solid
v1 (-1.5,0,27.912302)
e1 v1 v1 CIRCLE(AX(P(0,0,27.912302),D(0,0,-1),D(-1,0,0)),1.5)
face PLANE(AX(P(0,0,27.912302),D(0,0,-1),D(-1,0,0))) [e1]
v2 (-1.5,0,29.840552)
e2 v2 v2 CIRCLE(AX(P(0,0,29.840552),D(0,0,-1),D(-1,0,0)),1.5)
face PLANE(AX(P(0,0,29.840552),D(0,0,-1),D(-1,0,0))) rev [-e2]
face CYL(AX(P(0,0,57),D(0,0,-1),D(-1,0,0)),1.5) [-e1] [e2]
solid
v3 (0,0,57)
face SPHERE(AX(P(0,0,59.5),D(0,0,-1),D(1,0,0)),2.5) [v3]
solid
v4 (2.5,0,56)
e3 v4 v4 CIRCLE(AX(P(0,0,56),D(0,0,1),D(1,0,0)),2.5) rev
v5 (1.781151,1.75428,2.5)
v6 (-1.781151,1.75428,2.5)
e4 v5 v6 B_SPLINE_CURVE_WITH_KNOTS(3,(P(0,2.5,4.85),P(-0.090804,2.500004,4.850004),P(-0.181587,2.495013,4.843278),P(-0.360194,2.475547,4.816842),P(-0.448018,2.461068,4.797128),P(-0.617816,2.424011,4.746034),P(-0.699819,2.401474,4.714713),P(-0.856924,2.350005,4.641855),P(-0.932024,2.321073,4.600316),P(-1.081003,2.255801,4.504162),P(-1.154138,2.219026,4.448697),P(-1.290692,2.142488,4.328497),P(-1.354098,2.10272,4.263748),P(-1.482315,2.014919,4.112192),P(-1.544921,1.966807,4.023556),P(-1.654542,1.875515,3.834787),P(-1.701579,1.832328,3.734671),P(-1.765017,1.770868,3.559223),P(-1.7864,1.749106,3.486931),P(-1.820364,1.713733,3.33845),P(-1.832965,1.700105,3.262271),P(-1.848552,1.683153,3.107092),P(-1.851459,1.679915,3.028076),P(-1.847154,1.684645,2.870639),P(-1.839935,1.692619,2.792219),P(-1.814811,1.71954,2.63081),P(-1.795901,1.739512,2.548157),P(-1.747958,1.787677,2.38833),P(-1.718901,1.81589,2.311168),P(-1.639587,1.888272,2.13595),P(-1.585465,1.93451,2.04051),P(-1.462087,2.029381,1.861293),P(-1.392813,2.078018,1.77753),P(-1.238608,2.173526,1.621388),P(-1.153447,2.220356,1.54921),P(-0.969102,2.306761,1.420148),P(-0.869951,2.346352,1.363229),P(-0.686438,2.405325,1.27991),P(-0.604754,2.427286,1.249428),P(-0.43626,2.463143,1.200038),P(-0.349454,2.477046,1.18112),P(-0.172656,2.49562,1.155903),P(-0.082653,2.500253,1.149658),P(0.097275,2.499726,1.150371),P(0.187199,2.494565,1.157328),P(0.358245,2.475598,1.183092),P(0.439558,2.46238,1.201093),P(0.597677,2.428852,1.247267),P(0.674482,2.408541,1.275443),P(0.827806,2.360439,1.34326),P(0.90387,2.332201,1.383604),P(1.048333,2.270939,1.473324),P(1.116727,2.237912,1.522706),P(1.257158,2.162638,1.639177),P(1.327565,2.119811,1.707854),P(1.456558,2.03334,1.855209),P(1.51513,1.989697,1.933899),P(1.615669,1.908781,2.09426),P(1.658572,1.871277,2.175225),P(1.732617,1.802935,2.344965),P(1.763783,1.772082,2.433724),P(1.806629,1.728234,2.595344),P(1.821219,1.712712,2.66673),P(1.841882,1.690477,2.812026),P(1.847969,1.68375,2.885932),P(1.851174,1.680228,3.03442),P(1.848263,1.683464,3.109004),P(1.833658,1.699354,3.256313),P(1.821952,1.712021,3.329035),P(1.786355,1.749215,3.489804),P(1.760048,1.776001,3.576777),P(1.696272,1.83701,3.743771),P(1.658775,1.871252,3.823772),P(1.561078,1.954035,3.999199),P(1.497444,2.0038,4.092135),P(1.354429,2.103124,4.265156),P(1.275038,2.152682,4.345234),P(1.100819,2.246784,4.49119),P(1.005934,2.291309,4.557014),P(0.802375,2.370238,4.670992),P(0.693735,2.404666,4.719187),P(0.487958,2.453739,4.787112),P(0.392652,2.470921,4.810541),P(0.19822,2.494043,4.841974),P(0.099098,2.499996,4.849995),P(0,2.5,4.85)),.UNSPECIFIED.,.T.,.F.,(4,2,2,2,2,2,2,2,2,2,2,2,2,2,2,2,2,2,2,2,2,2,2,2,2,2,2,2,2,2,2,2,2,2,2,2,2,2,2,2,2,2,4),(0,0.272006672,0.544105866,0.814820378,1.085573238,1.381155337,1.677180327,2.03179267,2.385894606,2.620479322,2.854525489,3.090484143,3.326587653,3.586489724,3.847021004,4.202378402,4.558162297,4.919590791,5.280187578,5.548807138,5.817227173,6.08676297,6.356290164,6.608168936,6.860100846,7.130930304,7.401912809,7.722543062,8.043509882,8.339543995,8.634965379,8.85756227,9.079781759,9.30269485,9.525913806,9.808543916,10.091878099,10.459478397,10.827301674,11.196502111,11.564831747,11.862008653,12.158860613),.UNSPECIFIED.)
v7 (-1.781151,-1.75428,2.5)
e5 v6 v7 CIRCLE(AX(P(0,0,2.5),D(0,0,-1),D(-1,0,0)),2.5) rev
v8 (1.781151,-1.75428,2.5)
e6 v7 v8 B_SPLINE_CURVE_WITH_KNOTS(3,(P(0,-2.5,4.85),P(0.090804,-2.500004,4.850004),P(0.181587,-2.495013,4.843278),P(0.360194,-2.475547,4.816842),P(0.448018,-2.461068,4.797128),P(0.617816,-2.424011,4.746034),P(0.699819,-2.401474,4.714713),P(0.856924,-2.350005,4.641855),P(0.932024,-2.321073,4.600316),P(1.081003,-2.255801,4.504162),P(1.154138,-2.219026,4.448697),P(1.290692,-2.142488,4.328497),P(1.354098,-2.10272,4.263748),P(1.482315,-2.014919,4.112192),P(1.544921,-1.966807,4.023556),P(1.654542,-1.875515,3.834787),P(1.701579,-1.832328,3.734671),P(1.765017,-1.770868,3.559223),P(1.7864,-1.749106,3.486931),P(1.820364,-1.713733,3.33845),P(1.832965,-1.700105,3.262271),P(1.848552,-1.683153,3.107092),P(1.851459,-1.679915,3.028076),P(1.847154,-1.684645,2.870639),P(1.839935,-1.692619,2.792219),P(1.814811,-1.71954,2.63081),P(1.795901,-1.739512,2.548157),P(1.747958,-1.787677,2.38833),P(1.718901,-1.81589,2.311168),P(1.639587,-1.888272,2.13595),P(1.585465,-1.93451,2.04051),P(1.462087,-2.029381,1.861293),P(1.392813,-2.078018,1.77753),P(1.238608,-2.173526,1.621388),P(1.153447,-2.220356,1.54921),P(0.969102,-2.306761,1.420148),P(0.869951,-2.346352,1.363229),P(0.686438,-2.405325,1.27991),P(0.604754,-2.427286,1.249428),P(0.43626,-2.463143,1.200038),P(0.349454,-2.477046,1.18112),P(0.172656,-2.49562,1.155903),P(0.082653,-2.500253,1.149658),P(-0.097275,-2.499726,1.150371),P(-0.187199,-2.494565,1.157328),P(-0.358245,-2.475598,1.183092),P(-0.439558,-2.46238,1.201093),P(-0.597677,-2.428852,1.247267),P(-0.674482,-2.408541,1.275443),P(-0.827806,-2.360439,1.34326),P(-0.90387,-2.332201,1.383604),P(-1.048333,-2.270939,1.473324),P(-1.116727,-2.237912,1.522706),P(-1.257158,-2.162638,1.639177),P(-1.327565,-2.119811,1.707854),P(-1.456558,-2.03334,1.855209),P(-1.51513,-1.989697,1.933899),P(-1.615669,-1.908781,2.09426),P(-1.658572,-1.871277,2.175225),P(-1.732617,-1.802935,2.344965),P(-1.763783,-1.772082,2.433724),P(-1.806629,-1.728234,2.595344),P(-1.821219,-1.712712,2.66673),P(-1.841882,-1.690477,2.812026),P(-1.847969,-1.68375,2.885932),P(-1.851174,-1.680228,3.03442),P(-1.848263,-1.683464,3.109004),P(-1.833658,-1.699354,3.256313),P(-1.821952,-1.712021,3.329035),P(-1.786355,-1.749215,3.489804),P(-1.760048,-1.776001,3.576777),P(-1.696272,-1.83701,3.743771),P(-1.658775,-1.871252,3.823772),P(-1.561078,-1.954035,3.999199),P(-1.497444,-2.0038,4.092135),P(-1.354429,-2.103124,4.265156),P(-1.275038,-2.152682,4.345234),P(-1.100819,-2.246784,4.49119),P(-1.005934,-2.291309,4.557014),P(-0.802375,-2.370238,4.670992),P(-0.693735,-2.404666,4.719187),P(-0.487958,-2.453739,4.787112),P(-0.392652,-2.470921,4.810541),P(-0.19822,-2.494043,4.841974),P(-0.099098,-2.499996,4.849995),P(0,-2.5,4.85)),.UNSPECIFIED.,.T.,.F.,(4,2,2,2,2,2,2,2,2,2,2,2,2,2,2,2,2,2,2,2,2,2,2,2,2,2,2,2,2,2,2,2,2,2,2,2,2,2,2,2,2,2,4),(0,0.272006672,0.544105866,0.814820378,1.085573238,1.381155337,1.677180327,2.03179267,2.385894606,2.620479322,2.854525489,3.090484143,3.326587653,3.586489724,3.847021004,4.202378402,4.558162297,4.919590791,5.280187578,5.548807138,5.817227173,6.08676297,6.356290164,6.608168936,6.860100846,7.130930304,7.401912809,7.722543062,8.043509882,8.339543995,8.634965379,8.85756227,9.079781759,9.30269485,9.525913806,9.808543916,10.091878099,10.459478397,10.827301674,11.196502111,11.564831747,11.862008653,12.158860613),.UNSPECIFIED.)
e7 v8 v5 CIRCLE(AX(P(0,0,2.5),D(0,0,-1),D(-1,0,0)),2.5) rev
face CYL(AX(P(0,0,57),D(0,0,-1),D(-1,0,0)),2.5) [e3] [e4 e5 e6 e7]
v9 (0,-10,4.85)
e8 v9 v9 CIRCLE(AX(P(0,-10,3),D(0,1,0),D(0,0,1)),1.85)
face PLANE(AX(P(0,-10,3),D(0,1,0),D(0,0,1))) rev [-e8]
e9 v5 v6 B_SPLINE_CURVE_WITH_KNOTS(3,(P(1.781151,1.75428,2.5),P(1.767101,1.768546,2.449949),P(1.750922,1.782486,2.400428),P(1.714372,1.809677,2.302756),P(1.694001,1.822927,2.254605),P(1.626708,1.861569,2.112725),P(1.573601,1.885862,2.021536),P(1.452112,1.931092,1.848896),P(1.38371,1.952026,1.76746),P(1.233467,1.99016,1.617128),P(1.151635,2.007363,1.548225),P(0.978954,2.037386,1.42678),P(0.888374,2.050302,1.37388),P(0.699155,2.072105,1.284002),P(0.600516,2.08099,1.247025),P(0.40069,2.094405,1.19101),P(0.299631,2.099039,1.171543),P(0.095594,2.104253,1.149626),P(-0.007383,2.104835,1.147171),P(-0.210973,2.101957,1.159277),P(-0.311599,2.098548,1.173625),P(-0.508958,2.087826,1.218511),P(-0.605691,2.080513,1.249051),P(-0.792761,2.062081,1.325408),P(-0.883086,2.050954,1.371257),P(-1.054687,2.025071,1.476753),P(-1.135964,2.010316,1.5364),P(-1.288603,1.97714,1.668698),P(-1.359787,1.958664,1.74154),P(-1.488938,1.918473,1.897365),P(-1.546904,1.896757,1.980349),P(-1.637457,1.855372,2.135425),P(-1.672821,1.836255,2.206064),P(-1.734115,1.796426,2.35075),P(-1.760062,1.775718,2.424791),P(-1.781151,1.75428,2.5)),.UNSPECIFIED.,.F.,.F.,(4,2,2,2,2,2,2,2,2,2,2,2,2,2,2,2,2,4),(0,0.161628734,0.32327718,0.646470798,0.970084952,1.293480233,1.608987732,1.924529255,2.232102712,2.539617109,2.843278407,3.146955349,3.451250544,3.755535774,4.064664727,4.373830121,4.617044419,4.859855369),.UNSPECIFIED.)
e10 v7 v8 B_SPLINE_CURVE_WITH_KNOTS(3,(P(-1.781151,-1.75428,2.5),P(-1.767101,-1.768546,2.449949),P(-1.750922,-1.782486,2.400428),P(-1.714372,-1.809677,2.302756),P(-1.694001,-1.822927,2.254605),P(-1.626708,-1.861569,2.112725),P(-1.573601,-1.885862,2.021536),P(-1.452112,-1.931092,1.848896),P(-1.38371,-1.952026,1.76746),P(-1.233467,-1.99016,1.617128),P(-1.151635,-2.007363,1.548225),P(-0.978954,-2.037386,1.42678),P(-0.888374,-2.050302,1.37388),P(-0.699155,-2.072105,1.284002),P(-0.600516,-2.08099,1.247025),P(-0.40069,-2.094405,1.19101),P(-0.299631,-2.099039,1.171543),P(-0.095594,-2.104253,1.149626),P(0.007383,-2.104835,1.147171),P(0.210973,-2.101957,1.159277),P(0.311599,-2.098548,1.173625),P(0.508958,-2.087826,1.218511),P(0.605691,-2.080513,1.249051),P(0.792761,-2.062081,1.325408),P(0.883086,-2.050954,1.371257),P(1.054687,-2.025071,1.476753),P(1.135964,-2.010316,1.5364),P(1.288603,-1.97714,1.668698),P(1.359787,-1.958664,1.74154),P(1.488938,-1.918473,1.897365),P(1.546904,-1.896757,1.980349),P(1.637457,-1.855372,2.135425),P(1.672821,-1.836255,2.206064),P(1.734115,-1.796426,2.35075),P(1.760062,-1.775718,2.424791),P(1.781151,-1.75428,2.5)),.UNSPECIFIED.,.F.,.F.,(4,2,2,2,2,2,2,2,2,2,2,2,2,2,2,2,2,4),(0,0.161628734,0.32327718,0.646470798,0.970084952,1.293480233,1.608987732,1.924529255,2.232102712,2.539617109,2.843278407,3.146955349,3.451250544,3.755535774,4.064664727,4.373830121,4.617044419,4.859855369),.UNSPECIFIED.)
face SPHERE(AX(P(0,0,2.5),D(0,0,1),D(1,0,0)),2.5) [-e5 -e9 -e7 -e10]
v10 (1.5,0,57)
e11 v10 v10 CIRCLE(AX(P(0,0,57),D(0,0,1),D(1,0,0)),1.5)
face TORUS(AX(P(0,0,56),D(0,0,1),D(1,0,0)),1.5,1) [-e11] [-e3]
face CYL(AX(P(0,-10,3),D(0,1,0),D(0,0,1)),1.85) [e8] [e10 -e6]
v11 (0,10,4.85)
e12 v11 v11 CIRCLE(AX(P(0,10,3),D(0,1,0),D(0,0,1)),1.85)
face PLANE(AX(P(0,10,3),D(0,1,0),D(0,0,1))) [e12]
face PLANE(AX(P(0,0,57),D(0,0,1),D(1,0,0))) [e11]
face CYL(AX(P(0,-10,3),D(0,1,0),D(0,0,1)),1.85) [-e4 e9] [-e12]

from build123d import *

# Parameters (mm, degrees)
SKETCH1_R                = 2.5
BOSS_EXTRUDE1_DEPTH      = 57
SKETCH3_W                = 1.5
SKETCH3_H                = 1.928249817
FILLET1_R                = 1
BOSS_EXTRUDE2_DEPTH      = 10
BOSS_EXTRUDE2_DEPTH_BACK = 10
SKETCH4_R                = 1.85
FILLET2_R                = 2.5


with BuildPart() as part:
    # Sketch1 → Boss-Extrude1 (new body)
    with BuildSketch(Plane.XY):
        with Locations(Location((0, 0, 0), (0, 0, 180))):
            Circle(SKETCH1_R)
    extrude(amount=BOSS_EXTRUDE1_DEPTH)

    # Fillet1
    fillet1_edges = [part.edges().sort_by_distance(p)[0] for p in [
        (2.5, 0, 57),
    ]]
    fillet(fillet1_edges, radius=FILLET1_R)

    # Sketch4 → Boss-Extrude2 (add, two sides: drawn at the far end of the back side and taken through both)
    with BuildSketch(Plane(origin=(0, 0, 0), x_dir=(1, 0, 0), z_dir=(0, 1, 0)).offset(-BOSS_EXTRUDE2_DEPTH_BACK)):
        with Locations(Location((0, -3, 0), (0, 0, 270))):
            Circle(SKETCH4_R)
    extrude(amount=BOSS_EXTRUDE2_DEPTH + BOSS_EXTRUDE2_DEPTH_BACK)

    # Fillet2
    # the kernel refuses this fillet: 2.5 mm, written as the material it takes off along each edge
    with BuildSketch(Plane(origin=(0, 0, 0), x_dir=(-1, 0, 0), z_dir=(0, 1, 0))) as fillet2_piece_1_section:
        with BuildLine():
            CenterArc((2.5 - FILLET2_R, FILLET2_R), FILLET2_R, 270, 90)
            Line((2.5 - FILLET2_R, 0), (2.5, 0))
            Line((2.5, 0), (2.5, FILLET2_R))
        make_face()
    fillet2_piece_1 = revolve(axis=Axis((0, 0, 0), (0, 0, 1)), mode=Mode.PRIVATE)
    fillet2_piece_1 = fillet2_piece_1 - Plane(origin=(0, 0, 3), x_dir=(0, 0, 1), z_dir=(0, -1, 0)) * Cylinder(1.85, 10, mode=Mode.PRIVATE)
    add(fillet2_piece_1, mode=Mode.SUBTRACT)


with BuildPart() as body_2:
    # Sketch3 → Revolve1 (revolve)
    with BuildSketch(Plane(origin=(0, 0, 0), x_dir=(1, 0, 0), z_dir=(0, 1, 0)), mode=Mode.PRIVATE) as revolve1_sk:
        with BuildLine():
            Line((0, -57), (0, -62))
            ThreePointArc((0, -62), (-2.5, -59.5), (0, -57))
        make_face()
        with Locations((-0.75, -28.876426737)):
            Rectangle(SKETCH3_W, SKETCH3_H)
    revolve(revolve1_sk.sketch.rotate(Axis((0, 0, 57), (0, 0, 1)), 180), axis=Axis((0, 0, 57), (0, 0, 1)))


solid = Compound([part.part, body_2.part])
